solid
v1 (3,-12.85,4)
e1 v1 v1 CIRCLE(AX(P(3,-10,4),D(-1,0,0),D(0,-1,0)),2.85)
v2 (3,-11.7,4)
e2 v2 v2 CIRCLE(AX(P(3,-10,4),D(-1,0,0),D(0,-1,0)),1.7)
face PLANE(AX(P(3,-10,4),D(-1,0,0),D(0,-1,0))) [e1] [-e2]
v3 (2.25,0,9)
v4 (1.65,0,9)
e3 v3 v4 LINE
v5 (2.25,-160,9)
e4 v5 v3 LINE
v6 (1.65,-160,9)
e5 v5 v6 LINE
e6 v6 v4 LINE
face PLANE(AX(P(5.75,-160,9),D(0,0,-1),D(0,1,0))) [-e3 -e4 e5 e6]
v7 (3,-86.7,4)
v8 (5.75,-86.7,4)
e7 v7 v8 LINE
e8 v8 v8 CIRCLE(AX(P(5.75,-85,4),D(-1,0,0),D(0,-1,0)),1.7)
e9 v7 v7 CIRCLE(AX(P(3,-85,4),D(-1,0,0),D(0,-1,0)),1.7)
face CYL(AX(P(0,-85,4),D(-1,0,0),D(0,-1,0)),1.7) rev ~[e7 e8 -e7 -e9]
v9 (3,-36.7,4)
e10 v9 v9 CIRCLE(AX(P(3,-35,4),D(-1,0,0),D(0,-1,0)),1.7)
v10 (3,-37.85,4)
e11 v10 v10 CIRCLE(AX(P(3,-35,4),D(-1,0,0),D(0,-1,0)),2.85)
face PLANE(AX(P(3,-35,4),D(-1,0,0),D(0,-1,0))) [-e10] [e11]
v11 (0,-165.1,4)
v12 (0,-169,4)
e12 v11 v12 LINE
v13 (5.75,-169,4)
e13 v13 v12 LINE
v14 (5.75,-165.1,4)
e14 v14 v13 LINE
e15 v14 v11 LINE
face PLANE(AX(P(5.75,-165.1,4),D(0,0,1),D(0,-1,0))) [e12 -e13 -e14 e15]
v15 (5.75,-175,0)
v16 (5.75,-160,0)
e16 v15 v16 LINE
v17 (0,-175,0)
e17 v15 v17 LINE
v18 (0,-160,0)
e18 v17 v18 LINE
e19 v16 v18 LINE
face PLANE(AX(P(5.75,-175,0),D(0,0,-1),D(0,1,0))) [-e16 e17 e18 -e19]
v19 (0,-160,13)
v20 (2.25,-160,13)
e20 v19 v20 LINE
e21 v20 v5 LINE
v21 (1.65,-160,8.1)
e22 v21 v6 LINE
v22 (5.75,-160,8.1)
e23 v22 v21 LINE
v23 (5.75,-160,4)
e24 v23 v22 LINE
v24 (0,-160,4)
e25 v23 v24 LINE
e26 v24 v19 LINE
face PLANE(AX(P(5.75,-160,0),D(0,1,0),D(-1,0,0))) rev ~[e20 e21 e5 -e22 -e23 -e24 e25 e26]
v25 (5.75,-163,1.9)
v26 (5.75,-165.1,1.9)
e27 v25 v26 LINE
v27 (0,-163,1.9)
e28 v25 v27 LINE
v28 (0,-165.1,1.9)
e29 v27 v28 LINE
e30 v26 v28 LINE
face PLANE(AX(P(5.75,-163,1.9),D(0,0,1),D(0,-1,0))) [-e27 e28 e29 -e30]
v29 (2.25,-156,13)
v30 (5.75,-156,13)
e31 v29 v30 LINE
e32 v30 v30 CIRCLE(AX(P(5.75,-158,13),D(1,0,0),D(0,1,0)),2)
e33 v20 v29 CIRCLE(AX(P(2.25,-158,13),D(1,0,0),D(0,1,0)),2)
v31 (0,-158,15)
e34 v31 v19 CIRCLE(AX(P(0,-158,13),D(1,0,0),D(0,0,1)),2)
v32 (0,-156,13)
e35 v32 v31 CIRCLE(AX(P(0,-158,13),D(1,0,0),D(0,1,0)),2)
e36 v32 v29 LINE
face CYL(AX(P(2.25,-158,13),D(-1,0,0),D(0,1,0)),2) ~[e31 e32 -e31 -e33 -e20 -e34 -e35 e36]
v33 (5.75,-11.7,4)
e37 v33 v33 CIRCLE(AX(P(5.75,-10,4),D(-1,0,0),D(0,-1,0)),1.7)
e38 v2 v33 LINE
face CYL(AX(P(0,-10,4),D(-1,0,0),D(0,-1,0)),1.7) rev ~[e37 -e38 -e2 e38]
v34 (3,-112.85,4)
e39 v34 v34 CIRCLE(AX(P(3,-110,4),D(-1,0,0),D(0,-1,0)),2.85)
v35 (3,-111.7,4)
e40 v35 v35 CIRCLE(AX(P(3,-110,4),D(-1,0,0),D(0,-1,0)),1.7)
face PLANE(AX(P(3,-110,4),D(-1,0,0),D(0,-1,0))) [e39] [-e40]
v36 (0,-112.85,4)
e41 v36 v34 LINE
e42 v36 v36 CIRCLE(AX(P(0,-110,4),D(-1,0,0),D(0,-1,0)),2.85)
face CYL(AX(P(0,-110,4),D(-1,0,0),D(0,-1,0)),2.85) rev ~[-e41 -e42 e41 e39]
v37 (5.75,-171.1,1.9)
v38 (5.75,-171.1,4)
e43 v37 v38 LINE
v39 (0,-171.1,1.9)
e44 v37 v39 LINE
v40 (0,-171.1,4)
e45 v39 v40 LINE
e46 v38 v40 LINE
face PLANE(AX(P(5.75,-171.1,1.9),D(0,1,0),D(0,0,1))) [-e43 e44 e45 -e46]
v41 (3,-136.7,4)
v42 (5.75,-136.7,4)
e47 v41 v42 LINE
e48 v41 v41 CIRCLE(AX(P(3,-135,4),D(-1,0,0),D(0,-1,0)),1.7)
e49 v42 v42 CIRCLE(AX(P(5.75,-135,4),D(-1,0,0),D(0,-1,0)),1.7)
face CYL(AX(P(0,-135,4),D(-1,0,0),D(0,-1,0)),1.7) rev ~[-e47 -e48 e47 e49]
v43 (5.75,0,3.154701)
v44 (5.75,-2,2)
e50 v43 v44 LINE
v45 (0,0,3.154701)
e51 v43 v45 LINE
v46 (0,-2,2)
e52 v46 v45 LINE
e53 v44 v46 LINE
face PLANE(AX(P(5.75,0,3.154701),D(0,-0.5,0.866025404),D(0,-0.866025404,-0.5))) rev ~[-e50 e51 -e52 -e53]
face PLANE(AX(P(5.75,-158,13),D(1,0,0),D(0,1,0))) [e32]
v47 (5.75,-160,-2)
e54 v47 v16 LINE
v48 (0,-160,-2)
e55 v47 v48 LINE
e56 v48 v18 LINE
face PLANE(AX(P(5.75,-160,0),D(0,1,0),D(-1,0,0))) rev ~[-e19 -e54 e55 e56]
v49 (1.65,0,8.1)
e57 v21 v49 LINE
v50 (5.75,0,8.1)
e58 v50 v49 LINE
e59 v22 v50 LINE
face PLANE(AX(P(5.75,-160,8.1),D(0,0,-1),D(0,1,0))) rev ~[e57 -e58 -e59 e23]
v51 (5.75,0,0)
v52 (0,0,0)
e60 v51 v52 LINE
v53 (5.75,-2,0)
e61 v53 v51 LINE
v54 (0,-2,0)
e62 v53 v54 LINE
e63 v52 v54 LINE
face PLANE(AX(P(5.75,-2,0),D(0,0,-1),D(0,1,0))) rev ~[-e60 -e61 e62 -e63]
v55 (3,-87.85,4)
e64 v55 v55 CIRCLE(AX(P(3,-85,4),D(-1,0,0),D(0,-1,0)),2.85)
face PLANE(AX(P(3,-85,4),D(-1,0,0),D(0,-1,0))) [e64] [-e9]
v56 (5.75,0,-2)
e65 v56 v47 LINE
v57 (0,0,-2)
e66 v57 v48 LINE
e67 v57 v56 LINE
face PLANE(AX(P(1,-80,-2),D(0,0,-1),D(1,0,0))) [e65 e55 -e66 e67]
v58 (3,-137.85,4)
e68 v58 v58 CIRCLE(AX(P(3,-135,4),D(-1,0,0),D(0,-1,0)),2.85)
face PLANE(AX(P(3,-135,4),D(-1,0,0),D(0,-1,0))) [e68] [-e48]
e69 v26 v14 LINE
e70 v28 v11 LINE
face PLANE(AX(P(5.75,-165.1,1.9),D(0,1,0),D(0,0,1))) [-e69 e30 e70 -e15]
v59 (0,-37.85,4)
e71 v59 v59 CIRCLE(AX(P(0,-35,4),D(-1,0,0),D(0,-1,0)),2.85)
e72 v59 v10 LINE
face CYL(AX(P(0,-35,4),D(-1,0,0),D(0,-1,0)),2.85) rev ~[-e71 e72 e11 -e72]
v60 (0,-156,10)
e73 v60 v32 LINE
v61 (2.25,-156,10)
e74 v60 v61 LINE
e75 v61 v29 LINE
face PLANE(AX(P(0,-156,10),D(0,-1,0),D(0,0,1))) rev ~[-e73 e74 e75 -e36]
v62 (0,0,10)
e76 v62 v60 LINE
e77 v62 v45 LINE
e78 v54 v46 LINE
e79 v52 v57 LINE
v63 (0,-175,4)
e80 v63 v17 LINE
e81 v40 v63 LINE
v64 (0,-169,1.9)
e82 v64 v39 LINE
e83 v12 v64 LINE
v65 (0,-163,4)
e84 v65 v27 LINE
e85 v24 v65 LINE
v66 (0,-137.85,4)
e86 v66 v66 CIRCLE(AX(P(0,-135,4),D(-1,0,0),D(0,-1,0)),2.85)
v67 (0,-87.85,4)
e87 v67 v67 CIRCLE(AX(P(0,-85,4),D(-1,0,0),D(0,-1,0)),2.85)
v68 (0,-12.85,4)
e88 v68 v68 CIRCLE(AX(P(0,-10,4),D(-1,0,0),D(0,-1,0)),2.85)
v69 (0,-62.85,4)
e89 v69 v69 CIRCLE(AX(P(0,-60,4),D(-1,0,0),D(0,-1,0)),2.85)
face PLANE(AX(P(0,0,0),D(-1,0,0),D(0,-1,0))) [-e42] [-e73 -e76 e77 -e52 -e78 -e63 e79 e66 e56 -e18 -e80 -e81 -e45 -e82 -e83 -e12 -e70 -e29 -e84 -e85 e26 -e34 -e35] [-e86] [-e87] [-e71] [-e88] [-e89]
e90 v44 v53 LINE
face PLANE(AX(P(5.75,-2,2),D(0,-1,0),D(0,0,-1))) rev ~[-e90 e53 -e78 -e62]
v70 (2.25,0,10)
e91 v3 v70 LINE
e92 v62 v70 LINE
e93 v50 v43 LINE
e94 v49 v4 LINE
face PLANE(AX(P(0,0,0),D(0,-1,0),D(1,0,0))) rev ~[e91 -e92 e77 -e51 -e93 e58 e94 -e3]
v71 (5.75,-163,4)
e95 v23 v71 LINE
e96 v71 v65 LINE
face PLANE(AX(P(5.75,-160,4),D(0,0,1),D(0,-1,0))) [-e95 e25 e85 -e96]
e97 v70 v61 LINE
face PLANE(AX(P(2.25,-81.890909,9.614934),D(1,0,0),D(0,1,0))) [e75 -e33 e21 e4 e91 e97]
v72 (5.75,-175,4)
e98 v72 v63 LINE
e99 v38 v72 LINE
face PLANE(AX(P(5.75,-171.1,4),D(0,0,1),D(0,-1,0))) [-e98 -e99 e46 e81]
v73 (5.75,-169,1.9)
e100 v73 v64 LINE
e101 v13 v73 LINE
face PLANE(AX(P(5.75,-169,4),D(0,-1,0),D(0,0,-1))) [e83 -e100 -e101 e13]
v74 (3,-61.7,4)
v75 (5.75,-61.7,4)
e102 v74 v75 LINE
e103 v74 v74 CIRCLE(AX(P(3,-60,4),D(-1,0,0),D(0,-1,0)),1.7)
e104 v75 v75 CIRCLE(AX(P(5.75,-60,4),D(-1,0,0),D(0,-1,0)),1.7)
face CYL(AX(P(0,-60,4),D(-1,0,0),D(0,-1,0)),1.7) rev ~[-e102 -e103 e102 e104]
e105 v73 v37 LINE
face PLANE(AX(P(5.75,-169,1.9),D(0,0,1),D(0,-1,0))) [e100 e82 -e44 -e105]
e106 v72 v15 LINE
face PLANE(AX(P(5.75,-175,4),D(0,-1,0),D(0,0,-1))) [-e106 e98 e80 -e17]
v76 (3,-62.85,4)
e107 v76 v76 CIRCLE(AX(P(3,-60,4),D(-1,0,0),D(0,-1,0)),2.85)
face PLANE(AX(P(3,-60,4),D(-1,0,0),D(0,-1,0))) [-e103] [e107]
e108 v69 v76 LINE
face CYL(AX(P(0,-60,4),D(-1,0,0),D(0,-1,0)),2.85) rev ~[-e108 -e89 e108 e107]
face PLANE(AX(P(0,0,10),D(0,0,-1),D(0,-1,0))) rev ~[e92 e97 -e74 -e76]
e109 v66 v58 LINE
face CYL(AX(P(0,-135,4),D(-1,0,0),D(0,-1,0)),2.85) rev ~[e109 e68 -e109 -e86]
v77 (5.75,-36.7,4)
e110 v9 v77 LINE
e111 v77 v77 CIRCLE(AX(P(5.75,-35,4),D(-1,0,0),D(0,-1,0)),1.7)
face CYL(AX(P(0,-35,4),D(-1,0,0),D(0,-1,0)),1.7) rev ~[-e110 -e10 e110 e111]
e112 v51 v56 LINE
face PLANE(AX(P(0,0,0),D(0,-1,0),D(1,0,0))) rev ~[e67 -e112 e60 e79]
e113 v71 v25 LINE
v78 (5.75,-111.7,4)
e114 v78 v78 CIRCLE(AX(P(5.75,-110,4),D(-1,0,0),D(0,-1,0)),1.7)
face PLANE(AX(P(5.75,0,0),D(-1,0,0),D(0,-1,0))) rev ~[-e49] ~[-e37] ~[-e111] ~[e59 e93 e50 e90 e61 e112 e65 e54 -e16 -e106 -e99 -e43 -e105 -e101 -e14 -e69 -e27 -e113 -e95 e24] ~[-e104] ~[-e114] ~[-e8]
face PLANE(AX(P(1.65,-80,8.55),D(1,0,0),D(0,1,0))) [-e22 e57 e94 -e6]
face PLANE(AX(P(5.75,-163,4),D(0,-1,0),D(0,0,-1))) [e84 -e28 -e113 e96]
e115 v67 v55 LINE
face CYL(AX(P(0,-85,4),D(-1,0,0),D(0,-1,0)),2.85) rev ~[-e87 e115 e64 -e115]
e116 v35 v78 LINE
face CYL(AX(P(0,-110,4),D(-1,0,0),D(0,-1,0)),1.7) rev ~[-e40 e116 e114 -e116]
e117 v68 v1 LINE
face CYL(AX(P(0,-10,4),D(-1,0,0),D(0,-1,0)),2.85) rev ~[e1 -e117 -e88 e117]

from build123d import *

# Parameters (mm, degrees)
F1_DEPTH  = 5.75
F2_W      = 160
F2_H      = 0.9
F3_DEPTH  = 4.1
F5_DEPTH  = 3.5
F6_R      = 1.7
F7_DEPTH  = 25
F8_R      = 2.85
F8_R_2    = 1.7
F9_DEPTH  = 3
F11_DEPTH = 3.5
F12_W     = 2
F12_H     = 160
F12_W_2   = 3.75
F13_DEPTH = 2
F15_DEPTH = 5.75
F17_DEPTH = 25


# Not quite as in the source:
# - a feature names something its author has since deleted; it is built from what else it names


with BuildPart() as f1:
    # F0 (on Right) → F1 (new body)
    with BuildSketch(Plane.YZ):
        Polygon((-156, 10), (-160, 10), (-160, 0), (0, 0), (0, 10), align=None)
        with BuildLine():
            Line((-160, 13), (-160, 10))
            Line((-160, 10), (-156, 10))
            Line((-156, 10), (-156, 13))
            ThreePointArc((-156, 13), (-156.5857864376, 14.4142135624), (-158, 15))
            ThreePointArc((-158, 15), (-159.4142135624, 14.4142135624), (-160, 13))
        make_face()
    extrude(amount=F1_DEPTH)

    # F2 (on face) → F3 (cut)
    with BuildSketch(Plane.YZ.offset(5.75)):
        with Locations((-80, 8.55)):
            Rectangle(F2_W, F2_H)
    extrude(amount=-F3_DEPTH, mode=Mode.SUBTRACT)

    # F4 (on face) → F5 (cut)
    with BuildSketch(Plane.YZ.offset(5.75)):
        with BuildLine():
            ThreePointArc((-156, 13), (-158, 15), (-160, 13))
            Line((-160, 13), (-160, 9))
            Line((-160, 9), (0, 9))
            Line((0, 9), (0, 10))
            Line((0, 10), (-156, 10))
            Line((-156, 10), (-156, 13))
        make_face()
    extrude(amount=-F5_DEPTH, mode=Mode.SUBTRACT)

    # F6 (on face) → F7 (cut)
    with BuildSketch(Plane(origin=(0, 0, 0), x_dir=(0, -1, 0), z_dir=(-1, 0, 0))):
        with Locations((135, 4)):
            Circle(F6_R)
        with Locations((110, 4)):
            Circle(F6_R)
        with Locations((85, 4)):
            Circle(F6_R)
        with Locations((60, 4)):
            Circle(F6_R)
        with Locations((35, 4)):
            Circle(F6_R)
        with Locations((10, 4)):
            Circle(F6_R)
    extrude(amount=-F7_DEPTH, mode=Mode.SUBTRACT)

    # F8 (on face) → F9 (cut)
    with BuildSketch(Plane(origin=(0, 0, 0), x_dir=(0, -1, 0), z_dir=(-1, 0, 0))):
        with Locations((135, 4)):
            Circle(F8_R)
        with Locations((135, 4)):
            Circle(F8_R_2, mode=Mode.SUBTRACT)
        with Locations((110, 4)):
            Circle(F8_R)
        with Locations((110, 4)):
            Circle(F8_R_2, mode=Mode.SUBTRACT)
        with Locations((85, 4)):
            Circle(F8_R)
        with Locations((85, 4)):
            Circle(F8_R_2, mode=Mode.SUBTRACT)
        with Locations((60, 4)):
            Circle(F8_R)
        with Locations((60, 4)):
            Circle(F8_R_2, mode=Mode.SUBTRACT)
        with Locations((35, 4)):
            Circle(F8_R)
        with Locations((35, 4)):
            Circle(F8_R_2, mode=Mode.SUBTRACT)
        with Locations((10, 4)):
            Circle(F8_R)
        with Locations((10, 4)):
            Circle(F8_R_2, mode=Mode.SUBTRACT)
    extrude(amount=-F9_DEPTH, mode=Mode.SUBTRACT)

    # F10 (on face) → F11 (join, through all)
    with BuildSketch(Plane.YZ.offset(2.25)):
        with BuildLine():
            ThreePointArc((-160, 13), (-158, 11), (-156, 13))
            ThreePointArc((-156, 13), (-158, 15), (-160, 13))
        make_face()
    extrude(amount=F11_DEPTH)

    # F12 (on face) → F13 (join)
    with BuildSketch(Plane(origin=(0, 0, 0), x_dir=(1, 0, 0), z_dir=(0, 0, -1))):
        with Locations((1, 80)):
            Rectangle(F12_W, F12_H)
        with Locations((3.875, 80)):
            Rectangle(F12_W_2, F12_H)
    extrude(amount=F13_DEPTH)

    # F14 (on face) → F15 (join, through all)
    with BuildSketch(Plane.YZ.offset(5.75)):
        Polygon((-175, 0), (-160, 0), (-160, 4), (-163, 4), (-163, 1.9), (-165.1, 1.9), (-165.1, 4), (-169, 4), (-169, 1.9), (-171.1, 1.9), (-171.1, 4), (-175, 4), align=None)
    extrude(amount=-F15_DEPTH)

    # F16 (on face) → F17 (cut)
    with BuildSketch(Plane.YZ.offset(5.75)):
        Polygon((-2, 0), (0, 0), (0, 3.1547005384), (-2, 2), align=None)
    extrude(amount=-F17_DEPTH, mode=Mode.SUBTRACT)


solid = f1.part
